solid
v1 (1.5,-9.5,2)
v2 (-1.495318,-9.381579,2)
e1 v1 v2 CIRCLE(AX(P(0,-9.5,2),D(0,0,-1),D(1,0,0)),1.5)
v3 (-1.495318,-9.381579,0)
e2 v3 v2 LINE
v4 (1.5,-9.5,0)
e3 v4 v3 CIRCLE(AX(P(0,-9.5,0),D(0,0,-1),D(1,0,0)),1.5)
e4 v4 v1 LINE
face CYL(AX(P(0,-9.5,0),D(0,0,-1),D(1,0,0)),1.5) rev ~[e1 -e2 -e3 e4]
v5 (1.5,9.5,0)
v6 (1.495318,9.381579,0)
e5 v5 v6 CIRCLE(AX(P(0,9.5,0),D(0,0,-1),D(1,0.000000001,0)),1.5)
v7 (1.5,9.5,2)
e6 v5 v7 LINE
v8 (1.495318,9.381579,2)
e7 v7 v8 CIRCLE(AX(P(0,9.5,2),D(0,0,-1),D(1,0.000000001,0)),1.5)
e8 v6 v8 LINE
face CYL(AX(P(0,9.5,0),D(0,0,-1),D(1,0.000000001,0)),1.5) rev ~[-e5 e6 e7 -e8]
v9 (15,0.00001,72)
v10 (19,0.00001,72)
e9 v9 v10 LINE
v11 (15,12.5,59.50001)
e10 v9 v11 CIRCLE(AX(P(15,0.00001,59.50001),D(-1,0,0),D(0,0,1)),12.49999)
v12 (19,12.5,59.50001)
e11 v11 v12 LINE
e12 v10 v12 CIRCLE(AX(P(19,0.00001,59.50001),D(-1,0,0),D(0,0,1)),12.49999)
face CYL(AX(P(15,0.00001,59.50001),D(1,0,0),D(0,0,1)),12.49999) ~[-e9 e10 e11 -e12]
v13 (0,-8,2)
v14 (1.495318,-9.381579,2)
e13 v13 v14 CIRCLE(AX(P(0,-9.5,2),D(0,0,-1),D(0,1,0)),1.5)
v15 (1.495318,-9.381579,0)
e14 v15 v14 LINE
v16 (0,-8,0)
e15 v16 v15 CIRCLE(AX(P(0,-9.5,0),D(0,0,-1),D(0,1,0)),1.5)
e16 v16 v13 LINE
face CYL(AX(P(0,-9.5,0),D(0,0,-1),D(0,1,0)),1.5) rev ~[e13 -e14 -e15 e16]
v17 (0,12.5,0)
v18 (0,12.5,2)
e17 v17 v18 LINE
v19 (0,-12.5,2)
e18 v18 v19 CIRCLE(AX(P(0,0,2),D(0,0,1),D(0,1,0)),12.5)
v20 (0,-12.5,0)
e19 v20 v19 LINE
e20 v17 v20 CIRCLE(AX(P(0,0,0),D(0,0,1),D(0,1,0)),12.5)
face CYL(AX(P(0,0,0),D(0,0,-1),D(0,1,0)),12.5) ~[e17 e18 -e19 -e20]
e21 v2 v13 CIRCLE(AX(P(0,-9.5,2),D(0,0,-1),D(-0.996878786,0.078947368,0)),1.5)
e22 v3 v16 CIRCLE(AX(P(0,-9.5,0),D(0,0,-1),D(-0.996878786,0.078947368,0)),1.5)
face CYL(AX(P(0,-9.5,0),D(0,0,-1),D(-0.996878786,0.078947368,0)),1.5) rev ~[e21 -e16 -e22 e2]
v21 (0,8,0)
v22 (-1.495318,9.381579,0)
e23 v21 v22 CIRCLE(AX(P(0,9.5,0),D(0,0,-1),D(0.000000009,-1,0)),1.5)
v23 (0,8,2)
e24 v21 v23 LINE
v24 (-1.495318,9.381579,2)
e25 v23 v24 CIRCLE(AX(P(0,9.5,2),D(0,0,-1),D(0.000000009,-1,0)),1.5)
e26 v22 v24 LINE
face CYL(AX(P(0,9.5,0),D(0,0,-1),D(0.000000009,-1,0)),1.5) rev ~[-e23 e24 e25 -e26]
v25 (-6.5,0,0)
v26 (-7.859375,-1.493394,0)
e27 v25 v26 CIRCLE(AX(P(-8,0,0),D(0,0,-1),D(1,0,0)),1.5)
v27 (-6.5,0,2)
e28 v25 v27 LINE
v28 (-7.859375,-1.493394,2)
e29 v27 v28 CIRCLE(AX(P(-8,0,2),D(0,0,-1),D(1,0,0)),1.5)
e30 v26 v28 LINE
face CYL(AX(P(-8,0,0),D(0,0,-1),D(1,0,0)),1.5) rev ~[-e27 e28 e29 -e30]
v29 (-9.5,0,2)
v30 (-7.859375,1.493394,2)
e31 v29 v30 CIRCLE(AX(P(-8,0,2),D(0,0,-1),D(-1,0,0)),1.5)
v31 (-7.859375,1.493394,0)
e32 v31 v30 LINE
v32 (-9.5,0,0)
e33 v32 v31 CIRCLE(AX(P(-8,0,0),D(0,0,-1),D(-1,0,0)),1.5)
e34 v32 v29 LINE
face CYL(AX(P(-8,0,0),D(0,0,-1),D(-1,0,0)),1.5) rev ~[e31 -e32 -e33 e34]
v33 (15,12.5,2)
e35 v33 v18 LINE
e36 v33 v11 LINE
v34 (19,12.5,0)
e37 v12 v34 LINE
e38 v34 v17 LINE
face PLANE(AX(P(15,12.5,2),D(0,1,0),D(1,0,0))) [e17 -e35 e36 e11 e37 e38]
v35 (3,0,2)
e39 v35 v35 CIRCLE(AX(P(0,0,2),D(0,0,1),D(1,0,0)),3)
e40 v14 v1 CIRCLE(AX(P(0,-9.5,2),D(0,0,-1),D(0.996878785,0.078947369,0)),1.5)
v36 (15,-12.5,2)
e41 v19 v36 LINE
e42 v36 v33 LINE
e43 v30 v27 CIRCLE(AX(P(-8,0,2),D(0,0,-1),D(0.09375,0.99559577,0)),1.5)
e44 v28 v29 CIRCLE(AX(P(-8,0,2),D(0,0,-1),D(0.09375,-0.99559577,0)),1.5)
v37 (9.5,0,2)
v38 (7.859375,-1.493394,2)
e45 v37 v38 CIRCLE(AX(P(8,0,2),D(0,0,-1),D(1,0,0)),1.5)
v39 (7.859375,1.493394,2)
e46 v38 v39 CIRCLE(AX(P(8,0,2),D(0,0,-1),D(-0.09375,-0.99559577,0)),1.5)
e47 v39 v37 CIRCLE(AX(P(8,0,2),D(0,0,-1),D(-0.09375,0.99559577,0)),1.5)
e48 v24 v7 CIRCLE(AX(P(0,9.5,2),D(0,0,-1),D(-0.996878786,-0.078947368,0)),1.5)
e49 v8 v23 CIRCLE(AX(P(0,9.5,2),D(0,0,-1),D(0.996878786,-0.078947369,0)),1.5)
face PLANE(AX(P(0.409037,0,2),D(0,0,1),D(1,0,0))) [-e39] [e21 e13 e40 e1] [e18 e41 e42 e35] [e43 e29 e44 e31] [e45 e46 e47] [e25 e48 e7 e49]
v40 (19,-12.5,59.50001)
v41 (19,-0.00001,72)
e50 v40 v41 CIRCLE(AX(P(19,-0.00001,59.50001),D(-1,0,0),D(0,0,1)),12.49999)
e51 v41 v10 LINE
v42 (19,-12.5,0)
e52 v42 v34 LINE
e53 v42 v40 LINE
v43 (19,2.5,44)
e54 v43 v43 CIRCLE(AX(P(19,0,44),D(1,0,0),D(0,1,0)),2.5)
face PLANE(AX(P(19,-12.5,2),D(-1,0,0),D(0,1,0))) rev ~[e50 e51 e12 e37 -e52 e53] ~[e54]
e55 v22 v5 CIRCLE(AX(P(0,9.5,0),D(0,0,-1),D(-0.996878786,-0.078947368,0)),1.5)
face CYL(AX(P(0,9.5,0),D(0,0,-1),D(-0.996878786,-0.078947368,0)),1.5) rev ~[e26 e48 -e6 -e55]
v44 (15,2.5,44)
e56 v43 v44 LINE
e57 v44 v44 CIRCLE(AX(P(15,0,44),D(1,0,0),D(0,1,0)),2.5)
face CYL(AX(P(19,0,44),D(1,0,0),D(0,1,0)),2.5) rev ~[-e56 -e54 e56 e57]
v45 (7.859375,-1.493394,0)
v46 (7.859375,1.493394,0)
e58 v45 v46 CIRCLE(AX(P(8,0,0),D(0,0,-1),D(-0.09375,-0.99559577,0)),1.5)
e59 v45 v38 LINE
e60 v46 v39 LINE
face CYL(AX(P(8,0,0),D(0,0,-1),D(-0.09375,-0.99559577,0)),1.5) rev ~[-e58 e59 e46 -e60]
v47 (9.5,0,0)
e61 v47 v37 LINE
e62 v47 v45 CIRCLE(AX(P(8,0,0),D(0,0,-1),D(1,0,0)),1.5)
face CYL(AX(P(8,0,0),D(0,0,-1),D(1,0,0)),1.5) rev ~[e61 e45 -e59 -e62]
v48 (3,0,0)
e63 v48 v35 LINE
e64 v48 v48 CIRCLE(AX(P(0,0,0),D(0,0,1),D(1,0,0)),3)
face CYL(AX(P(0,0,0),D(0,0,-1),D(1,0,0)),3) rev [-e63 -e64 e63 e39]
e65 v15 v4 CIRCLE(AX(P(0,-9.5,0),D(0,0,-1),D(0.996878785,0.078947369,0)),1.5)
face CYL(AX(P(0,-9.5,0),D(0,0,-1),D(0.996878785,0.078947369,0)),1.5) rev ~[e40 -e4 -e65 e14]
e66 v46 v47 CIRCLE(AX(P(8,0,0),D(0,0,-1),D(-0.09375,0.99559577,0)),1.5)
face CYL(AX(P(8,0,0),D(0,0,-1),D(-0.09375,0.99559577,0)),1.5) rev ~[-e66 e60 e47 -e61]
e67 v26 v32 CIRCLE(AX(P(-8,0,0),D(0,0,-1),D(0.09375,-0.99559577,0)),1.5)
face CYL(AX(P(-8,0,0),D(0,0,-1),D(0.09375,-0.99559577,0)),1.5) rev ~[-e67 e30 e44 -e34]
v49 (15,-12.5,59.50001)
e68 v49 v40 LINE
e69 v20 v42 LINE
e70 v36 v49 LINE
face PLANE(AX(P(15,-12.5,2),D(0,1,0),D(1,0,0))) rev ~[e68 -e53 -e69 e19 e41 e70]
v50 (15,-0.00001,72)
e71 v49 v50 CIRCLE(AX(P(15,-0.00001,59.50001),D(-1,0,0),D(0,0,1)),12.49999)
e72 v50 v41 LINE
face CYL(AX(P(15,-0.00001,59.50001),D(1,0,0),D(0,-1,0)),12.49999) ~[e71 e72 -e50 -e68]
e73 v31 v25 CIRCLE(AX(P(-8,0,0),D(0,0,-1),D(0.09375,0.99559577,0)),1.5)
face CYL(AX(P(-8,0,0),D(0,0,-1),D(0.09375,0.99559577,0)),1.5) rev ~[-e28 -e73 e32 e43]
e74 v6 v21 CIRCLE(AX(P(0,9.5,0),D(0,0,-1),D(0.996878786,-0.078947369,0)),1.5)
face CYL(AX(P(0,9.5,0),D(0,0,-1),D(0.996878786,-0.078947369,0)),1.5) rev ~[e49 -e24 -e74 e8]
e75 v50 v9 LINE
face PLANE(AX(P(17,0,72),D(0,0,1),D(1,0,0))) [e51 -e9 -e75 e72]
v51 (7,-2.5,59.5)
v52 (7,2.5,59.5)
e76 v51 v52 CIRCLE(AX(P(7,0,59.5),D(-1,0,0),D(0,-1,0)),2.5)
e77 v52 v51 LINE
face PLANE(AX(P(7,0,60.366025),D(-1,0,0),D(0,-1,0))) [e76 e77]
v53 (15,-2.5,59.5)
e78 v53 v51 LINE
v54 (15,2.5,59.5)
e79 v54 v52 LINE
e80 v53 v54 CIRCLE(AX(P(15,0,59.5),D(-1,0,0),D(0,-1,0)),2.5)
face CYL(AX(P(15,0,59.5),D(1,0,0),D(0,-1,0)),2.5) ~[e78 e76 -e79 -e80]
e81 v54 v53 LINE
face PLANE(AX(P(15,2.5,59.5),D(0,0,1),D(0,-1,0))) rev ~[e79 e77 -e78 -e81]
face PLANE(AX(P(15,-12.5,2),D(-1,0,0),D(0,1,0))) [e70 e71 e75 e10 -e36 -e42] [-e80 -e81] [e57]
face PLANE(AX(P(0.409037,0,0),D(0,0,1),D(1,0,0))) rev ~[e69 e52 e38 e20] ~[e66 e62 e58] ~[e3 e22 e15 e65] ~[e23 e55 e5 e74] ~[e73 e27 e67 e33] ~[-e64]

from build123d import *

# Parameters (mm, degrees)
F0_R     = 3
F1_DEPTH = 2
F2_W     = 4
F2_H     = 25
F3_DEPTH = 70
F5_DEPTH = 8
F6_R     = 12.49999
F7_R     = 2.5
F8_DEPTH = 4


# Not quite as in the source:
# - a fillet or chamfer is up to 0.001 mm smaller than in the source, because OpenCascade refuses the exact size
# - a feature names something its author has since deleted; it is built from what else it names


with BuildPart() as f1:
    # F0 (on Top) → F1 (new body)
    with BuildSketch(Plane.XY):
        with BuildLine():
            ThreePointArc((0, -12.5), (8.8388347648, -8.8388347648), (12.5, 0))
            ThreePointArc((12.5, 0), (8.8388347648, 8.8388347648), (0, 12.5))
            ThreePointArc((0, 12.5), (-12.5, 0), (0, -12.5))
        make_face()
        with BuildLine():
            ThreePointArc((1.4953181783, 9.3815789474), (7.2268777039, 6.1662175321), (9.5, 0))
            ThreePointArc((9.5, 0), (7.2268777039, -6.1662175321), (1.4953181783, -9.3815789474))
            ThreePointArc((1.4953181783, -9.3815789474), (1.4988290876, -9.4407432173), (1.5, -9.5))
            ThreePointArc((1.5, -9.5), (-0.0592567827, -10.9988290876), (-1.4953181783, -9.3815789474))
            ThreePointArc((-1.4953181783, -9.3815789474), (-7.2268777039, -6.1662175321), (-9.5, 0))
            ThreePointArc((-9.5, 0), (-7.2268777039, 6.1662175321), (-1.4953181783, 9.3815789474))
            ThreePointArc((-1.4953181783, 9.3815789474), (-0.0592567827, 10.9988290876), (1.5, 9.5))
            ThreePointArc((1.5, 9.5), (1.4988290876, 9.4407432173), (1.4953181783, 9.3815789474))
        make_face(mode=Mode.SUBTRACT)
        with BuildLine():
            ThreePointArc((0, 12.5), (8.8388347648, 8.8388347648), (12.5, 0))
            ThreePointArc((12.5, 0), (8.8388347648, -8.8388347648), (0, -12.5))
            Line((0, -12.5), (19, -12.5))
            Line((19, -12.5), (19, 12.5))
            Line((19, 12.5), (0, 12.5))
        make_face()
        with BuildLine():
            ThreePointArc((7.859375, -1.4933936552), (6.5, 0), (7.859375, 1.4933936552))
            ThreePointArc((7.859375, 1.4933936552), (5.1016100823, 6.1622702446), (1.34e-08, 8))
            ThreePointArc((1.34e-08, 8), (-5.101610072, 6.1622702532), (-7.859375, 1.4933936552))
            ThreePointArc((-7.859375, 1.4933936552), (-6.8907350407, 1.0097184013), (-6.5, 0))
            ThreePointArc((-6.5, 0), (-6.8907350407, -1.0097184013), (-7.859375, -1.4933936552))
            ThreePointArc((-7.859375, -1.4933936552), (-5.1016100771, -6.1622702489), (0, -8))
            ThreePointArc((0, -8), (5.1016100771, -6.1622702489), (7.859375, -1.4933936552))
        make_face()
        Circle(F0_R, mode=Mode.SUBTRACT)
        with BuildLine():
            ThreePointArc((7.859375, 1.4933936552), (9.0097184013, 1.1092649593), (9.5, 0))
            ThreePointArc((9.5, 0), (7.2268777039, 6.1662175321), (1.4953181783, 9.3815789474))
            ThreePointArc((1.4953181783, 9.3815789474), (1.0179313437, 8.3982669201), (1.34e-08, 8))
            ThreePointArc((1.34e-08, 8), (5.1016100823, 6.1622702446), (7.859375, 1.4933936552))
        make_face()
        with BuildLine():
            ThreePointArc((1.4953181783, -9.3815789474), (7.2268777039, -6.1662175321), (9.5, 0))
            ThreePointArc((9.5, 0), (9.0097184013, -1.1092649593), (7.859375, -1.4933936552))
            ThreePointArc((7.859375, -1.4933936552), (5.1016100771, -6.1622702489), (0, -8))
            ThreePointArc((0, -8), (1.0179313388, -8.3982669155), (1.4953181783, -9.3815789474))
        make_face()
        with BuildLine():
            ThreePointArc((1.34e-08, 8), (-1.0179313339, 8.3982669109), (-1.4953181783, 9.3815789474))
            ThreePointArc((-1.4953181783, 9.3815789474), (-7.2268777039, 6.1662175321), (-9.5, 0))
            ThreePointArc((-9.5, 0), (-9.0097184013, 1.1092649593), (-7.859375, 1.4933936552))
            ThreePointArc((-7.859375, 1.4933936552), (-5.101610072, 6.1622702532), (1.34e-08, 8))
        make_face()
        with BuildLine():
            ThreePointArc((-9.5, 0), (-7.2268777039, -6.1662175321), (-1.4953181783, -9.3815789474))
            ThreePointArc((-1.4953181783, -9.3815789474), (-1.0179313388, -8.3982669155), (0, -8))
            ThreePointArc((0, -8), (-5.1016100771, -6.1622702489), (-7.859375, -1.4933936552))
            ThreePointArc((-7.859375, -1.4933936552), (-9.0097184013, -1.1092649593), (-9.5, 0))
        make_face()
    extrude(amount=F1_DEPTH)

    # F2 (on face) → F3 (join)
    with BuildSketch(Plane.XY.offset(2)):
        with Locations((17, 0)):
            Rectangle(F2_W, F2_H)
    extrude(amount=F3_DEPTH)

    # F4 (on face) → F5 (join)
    with BuildSketch(Plane(origin=(15, 0, 0), x_dir=(0, -1, 0), z_dir=(-1, 0, 0))):
        with BuildLine():
            Line((-2.5, 59.5), (2.5, 59.5))
            ThreePointArc((2.5, 59.5), (0, 62), (-2.5, 59.5))
        make_face()
    extrude(amount=F5_DEPTH)

    # F6 (radius 12.5 in the source; OpenCascade refuses exactly that, so slightly less here)
    f6_edges = [f1.edges().sort_by_distance(p)[0] for p in [
        (17, -12.5, 72),
        (17, 12.5, 72),
    ]]
    fillet(f6_edges, radius=F6_R)

    # F7 (on face) → F8 (cut, through all)
    with BuildSketch(Plane.YZ.offset(19)):
        with Locations((0, 44)):
            Circle(F7_R)
    extrude(amount=-F8_DEPTH, mode=Mode.SUBTRACT)


solid = f1.part
